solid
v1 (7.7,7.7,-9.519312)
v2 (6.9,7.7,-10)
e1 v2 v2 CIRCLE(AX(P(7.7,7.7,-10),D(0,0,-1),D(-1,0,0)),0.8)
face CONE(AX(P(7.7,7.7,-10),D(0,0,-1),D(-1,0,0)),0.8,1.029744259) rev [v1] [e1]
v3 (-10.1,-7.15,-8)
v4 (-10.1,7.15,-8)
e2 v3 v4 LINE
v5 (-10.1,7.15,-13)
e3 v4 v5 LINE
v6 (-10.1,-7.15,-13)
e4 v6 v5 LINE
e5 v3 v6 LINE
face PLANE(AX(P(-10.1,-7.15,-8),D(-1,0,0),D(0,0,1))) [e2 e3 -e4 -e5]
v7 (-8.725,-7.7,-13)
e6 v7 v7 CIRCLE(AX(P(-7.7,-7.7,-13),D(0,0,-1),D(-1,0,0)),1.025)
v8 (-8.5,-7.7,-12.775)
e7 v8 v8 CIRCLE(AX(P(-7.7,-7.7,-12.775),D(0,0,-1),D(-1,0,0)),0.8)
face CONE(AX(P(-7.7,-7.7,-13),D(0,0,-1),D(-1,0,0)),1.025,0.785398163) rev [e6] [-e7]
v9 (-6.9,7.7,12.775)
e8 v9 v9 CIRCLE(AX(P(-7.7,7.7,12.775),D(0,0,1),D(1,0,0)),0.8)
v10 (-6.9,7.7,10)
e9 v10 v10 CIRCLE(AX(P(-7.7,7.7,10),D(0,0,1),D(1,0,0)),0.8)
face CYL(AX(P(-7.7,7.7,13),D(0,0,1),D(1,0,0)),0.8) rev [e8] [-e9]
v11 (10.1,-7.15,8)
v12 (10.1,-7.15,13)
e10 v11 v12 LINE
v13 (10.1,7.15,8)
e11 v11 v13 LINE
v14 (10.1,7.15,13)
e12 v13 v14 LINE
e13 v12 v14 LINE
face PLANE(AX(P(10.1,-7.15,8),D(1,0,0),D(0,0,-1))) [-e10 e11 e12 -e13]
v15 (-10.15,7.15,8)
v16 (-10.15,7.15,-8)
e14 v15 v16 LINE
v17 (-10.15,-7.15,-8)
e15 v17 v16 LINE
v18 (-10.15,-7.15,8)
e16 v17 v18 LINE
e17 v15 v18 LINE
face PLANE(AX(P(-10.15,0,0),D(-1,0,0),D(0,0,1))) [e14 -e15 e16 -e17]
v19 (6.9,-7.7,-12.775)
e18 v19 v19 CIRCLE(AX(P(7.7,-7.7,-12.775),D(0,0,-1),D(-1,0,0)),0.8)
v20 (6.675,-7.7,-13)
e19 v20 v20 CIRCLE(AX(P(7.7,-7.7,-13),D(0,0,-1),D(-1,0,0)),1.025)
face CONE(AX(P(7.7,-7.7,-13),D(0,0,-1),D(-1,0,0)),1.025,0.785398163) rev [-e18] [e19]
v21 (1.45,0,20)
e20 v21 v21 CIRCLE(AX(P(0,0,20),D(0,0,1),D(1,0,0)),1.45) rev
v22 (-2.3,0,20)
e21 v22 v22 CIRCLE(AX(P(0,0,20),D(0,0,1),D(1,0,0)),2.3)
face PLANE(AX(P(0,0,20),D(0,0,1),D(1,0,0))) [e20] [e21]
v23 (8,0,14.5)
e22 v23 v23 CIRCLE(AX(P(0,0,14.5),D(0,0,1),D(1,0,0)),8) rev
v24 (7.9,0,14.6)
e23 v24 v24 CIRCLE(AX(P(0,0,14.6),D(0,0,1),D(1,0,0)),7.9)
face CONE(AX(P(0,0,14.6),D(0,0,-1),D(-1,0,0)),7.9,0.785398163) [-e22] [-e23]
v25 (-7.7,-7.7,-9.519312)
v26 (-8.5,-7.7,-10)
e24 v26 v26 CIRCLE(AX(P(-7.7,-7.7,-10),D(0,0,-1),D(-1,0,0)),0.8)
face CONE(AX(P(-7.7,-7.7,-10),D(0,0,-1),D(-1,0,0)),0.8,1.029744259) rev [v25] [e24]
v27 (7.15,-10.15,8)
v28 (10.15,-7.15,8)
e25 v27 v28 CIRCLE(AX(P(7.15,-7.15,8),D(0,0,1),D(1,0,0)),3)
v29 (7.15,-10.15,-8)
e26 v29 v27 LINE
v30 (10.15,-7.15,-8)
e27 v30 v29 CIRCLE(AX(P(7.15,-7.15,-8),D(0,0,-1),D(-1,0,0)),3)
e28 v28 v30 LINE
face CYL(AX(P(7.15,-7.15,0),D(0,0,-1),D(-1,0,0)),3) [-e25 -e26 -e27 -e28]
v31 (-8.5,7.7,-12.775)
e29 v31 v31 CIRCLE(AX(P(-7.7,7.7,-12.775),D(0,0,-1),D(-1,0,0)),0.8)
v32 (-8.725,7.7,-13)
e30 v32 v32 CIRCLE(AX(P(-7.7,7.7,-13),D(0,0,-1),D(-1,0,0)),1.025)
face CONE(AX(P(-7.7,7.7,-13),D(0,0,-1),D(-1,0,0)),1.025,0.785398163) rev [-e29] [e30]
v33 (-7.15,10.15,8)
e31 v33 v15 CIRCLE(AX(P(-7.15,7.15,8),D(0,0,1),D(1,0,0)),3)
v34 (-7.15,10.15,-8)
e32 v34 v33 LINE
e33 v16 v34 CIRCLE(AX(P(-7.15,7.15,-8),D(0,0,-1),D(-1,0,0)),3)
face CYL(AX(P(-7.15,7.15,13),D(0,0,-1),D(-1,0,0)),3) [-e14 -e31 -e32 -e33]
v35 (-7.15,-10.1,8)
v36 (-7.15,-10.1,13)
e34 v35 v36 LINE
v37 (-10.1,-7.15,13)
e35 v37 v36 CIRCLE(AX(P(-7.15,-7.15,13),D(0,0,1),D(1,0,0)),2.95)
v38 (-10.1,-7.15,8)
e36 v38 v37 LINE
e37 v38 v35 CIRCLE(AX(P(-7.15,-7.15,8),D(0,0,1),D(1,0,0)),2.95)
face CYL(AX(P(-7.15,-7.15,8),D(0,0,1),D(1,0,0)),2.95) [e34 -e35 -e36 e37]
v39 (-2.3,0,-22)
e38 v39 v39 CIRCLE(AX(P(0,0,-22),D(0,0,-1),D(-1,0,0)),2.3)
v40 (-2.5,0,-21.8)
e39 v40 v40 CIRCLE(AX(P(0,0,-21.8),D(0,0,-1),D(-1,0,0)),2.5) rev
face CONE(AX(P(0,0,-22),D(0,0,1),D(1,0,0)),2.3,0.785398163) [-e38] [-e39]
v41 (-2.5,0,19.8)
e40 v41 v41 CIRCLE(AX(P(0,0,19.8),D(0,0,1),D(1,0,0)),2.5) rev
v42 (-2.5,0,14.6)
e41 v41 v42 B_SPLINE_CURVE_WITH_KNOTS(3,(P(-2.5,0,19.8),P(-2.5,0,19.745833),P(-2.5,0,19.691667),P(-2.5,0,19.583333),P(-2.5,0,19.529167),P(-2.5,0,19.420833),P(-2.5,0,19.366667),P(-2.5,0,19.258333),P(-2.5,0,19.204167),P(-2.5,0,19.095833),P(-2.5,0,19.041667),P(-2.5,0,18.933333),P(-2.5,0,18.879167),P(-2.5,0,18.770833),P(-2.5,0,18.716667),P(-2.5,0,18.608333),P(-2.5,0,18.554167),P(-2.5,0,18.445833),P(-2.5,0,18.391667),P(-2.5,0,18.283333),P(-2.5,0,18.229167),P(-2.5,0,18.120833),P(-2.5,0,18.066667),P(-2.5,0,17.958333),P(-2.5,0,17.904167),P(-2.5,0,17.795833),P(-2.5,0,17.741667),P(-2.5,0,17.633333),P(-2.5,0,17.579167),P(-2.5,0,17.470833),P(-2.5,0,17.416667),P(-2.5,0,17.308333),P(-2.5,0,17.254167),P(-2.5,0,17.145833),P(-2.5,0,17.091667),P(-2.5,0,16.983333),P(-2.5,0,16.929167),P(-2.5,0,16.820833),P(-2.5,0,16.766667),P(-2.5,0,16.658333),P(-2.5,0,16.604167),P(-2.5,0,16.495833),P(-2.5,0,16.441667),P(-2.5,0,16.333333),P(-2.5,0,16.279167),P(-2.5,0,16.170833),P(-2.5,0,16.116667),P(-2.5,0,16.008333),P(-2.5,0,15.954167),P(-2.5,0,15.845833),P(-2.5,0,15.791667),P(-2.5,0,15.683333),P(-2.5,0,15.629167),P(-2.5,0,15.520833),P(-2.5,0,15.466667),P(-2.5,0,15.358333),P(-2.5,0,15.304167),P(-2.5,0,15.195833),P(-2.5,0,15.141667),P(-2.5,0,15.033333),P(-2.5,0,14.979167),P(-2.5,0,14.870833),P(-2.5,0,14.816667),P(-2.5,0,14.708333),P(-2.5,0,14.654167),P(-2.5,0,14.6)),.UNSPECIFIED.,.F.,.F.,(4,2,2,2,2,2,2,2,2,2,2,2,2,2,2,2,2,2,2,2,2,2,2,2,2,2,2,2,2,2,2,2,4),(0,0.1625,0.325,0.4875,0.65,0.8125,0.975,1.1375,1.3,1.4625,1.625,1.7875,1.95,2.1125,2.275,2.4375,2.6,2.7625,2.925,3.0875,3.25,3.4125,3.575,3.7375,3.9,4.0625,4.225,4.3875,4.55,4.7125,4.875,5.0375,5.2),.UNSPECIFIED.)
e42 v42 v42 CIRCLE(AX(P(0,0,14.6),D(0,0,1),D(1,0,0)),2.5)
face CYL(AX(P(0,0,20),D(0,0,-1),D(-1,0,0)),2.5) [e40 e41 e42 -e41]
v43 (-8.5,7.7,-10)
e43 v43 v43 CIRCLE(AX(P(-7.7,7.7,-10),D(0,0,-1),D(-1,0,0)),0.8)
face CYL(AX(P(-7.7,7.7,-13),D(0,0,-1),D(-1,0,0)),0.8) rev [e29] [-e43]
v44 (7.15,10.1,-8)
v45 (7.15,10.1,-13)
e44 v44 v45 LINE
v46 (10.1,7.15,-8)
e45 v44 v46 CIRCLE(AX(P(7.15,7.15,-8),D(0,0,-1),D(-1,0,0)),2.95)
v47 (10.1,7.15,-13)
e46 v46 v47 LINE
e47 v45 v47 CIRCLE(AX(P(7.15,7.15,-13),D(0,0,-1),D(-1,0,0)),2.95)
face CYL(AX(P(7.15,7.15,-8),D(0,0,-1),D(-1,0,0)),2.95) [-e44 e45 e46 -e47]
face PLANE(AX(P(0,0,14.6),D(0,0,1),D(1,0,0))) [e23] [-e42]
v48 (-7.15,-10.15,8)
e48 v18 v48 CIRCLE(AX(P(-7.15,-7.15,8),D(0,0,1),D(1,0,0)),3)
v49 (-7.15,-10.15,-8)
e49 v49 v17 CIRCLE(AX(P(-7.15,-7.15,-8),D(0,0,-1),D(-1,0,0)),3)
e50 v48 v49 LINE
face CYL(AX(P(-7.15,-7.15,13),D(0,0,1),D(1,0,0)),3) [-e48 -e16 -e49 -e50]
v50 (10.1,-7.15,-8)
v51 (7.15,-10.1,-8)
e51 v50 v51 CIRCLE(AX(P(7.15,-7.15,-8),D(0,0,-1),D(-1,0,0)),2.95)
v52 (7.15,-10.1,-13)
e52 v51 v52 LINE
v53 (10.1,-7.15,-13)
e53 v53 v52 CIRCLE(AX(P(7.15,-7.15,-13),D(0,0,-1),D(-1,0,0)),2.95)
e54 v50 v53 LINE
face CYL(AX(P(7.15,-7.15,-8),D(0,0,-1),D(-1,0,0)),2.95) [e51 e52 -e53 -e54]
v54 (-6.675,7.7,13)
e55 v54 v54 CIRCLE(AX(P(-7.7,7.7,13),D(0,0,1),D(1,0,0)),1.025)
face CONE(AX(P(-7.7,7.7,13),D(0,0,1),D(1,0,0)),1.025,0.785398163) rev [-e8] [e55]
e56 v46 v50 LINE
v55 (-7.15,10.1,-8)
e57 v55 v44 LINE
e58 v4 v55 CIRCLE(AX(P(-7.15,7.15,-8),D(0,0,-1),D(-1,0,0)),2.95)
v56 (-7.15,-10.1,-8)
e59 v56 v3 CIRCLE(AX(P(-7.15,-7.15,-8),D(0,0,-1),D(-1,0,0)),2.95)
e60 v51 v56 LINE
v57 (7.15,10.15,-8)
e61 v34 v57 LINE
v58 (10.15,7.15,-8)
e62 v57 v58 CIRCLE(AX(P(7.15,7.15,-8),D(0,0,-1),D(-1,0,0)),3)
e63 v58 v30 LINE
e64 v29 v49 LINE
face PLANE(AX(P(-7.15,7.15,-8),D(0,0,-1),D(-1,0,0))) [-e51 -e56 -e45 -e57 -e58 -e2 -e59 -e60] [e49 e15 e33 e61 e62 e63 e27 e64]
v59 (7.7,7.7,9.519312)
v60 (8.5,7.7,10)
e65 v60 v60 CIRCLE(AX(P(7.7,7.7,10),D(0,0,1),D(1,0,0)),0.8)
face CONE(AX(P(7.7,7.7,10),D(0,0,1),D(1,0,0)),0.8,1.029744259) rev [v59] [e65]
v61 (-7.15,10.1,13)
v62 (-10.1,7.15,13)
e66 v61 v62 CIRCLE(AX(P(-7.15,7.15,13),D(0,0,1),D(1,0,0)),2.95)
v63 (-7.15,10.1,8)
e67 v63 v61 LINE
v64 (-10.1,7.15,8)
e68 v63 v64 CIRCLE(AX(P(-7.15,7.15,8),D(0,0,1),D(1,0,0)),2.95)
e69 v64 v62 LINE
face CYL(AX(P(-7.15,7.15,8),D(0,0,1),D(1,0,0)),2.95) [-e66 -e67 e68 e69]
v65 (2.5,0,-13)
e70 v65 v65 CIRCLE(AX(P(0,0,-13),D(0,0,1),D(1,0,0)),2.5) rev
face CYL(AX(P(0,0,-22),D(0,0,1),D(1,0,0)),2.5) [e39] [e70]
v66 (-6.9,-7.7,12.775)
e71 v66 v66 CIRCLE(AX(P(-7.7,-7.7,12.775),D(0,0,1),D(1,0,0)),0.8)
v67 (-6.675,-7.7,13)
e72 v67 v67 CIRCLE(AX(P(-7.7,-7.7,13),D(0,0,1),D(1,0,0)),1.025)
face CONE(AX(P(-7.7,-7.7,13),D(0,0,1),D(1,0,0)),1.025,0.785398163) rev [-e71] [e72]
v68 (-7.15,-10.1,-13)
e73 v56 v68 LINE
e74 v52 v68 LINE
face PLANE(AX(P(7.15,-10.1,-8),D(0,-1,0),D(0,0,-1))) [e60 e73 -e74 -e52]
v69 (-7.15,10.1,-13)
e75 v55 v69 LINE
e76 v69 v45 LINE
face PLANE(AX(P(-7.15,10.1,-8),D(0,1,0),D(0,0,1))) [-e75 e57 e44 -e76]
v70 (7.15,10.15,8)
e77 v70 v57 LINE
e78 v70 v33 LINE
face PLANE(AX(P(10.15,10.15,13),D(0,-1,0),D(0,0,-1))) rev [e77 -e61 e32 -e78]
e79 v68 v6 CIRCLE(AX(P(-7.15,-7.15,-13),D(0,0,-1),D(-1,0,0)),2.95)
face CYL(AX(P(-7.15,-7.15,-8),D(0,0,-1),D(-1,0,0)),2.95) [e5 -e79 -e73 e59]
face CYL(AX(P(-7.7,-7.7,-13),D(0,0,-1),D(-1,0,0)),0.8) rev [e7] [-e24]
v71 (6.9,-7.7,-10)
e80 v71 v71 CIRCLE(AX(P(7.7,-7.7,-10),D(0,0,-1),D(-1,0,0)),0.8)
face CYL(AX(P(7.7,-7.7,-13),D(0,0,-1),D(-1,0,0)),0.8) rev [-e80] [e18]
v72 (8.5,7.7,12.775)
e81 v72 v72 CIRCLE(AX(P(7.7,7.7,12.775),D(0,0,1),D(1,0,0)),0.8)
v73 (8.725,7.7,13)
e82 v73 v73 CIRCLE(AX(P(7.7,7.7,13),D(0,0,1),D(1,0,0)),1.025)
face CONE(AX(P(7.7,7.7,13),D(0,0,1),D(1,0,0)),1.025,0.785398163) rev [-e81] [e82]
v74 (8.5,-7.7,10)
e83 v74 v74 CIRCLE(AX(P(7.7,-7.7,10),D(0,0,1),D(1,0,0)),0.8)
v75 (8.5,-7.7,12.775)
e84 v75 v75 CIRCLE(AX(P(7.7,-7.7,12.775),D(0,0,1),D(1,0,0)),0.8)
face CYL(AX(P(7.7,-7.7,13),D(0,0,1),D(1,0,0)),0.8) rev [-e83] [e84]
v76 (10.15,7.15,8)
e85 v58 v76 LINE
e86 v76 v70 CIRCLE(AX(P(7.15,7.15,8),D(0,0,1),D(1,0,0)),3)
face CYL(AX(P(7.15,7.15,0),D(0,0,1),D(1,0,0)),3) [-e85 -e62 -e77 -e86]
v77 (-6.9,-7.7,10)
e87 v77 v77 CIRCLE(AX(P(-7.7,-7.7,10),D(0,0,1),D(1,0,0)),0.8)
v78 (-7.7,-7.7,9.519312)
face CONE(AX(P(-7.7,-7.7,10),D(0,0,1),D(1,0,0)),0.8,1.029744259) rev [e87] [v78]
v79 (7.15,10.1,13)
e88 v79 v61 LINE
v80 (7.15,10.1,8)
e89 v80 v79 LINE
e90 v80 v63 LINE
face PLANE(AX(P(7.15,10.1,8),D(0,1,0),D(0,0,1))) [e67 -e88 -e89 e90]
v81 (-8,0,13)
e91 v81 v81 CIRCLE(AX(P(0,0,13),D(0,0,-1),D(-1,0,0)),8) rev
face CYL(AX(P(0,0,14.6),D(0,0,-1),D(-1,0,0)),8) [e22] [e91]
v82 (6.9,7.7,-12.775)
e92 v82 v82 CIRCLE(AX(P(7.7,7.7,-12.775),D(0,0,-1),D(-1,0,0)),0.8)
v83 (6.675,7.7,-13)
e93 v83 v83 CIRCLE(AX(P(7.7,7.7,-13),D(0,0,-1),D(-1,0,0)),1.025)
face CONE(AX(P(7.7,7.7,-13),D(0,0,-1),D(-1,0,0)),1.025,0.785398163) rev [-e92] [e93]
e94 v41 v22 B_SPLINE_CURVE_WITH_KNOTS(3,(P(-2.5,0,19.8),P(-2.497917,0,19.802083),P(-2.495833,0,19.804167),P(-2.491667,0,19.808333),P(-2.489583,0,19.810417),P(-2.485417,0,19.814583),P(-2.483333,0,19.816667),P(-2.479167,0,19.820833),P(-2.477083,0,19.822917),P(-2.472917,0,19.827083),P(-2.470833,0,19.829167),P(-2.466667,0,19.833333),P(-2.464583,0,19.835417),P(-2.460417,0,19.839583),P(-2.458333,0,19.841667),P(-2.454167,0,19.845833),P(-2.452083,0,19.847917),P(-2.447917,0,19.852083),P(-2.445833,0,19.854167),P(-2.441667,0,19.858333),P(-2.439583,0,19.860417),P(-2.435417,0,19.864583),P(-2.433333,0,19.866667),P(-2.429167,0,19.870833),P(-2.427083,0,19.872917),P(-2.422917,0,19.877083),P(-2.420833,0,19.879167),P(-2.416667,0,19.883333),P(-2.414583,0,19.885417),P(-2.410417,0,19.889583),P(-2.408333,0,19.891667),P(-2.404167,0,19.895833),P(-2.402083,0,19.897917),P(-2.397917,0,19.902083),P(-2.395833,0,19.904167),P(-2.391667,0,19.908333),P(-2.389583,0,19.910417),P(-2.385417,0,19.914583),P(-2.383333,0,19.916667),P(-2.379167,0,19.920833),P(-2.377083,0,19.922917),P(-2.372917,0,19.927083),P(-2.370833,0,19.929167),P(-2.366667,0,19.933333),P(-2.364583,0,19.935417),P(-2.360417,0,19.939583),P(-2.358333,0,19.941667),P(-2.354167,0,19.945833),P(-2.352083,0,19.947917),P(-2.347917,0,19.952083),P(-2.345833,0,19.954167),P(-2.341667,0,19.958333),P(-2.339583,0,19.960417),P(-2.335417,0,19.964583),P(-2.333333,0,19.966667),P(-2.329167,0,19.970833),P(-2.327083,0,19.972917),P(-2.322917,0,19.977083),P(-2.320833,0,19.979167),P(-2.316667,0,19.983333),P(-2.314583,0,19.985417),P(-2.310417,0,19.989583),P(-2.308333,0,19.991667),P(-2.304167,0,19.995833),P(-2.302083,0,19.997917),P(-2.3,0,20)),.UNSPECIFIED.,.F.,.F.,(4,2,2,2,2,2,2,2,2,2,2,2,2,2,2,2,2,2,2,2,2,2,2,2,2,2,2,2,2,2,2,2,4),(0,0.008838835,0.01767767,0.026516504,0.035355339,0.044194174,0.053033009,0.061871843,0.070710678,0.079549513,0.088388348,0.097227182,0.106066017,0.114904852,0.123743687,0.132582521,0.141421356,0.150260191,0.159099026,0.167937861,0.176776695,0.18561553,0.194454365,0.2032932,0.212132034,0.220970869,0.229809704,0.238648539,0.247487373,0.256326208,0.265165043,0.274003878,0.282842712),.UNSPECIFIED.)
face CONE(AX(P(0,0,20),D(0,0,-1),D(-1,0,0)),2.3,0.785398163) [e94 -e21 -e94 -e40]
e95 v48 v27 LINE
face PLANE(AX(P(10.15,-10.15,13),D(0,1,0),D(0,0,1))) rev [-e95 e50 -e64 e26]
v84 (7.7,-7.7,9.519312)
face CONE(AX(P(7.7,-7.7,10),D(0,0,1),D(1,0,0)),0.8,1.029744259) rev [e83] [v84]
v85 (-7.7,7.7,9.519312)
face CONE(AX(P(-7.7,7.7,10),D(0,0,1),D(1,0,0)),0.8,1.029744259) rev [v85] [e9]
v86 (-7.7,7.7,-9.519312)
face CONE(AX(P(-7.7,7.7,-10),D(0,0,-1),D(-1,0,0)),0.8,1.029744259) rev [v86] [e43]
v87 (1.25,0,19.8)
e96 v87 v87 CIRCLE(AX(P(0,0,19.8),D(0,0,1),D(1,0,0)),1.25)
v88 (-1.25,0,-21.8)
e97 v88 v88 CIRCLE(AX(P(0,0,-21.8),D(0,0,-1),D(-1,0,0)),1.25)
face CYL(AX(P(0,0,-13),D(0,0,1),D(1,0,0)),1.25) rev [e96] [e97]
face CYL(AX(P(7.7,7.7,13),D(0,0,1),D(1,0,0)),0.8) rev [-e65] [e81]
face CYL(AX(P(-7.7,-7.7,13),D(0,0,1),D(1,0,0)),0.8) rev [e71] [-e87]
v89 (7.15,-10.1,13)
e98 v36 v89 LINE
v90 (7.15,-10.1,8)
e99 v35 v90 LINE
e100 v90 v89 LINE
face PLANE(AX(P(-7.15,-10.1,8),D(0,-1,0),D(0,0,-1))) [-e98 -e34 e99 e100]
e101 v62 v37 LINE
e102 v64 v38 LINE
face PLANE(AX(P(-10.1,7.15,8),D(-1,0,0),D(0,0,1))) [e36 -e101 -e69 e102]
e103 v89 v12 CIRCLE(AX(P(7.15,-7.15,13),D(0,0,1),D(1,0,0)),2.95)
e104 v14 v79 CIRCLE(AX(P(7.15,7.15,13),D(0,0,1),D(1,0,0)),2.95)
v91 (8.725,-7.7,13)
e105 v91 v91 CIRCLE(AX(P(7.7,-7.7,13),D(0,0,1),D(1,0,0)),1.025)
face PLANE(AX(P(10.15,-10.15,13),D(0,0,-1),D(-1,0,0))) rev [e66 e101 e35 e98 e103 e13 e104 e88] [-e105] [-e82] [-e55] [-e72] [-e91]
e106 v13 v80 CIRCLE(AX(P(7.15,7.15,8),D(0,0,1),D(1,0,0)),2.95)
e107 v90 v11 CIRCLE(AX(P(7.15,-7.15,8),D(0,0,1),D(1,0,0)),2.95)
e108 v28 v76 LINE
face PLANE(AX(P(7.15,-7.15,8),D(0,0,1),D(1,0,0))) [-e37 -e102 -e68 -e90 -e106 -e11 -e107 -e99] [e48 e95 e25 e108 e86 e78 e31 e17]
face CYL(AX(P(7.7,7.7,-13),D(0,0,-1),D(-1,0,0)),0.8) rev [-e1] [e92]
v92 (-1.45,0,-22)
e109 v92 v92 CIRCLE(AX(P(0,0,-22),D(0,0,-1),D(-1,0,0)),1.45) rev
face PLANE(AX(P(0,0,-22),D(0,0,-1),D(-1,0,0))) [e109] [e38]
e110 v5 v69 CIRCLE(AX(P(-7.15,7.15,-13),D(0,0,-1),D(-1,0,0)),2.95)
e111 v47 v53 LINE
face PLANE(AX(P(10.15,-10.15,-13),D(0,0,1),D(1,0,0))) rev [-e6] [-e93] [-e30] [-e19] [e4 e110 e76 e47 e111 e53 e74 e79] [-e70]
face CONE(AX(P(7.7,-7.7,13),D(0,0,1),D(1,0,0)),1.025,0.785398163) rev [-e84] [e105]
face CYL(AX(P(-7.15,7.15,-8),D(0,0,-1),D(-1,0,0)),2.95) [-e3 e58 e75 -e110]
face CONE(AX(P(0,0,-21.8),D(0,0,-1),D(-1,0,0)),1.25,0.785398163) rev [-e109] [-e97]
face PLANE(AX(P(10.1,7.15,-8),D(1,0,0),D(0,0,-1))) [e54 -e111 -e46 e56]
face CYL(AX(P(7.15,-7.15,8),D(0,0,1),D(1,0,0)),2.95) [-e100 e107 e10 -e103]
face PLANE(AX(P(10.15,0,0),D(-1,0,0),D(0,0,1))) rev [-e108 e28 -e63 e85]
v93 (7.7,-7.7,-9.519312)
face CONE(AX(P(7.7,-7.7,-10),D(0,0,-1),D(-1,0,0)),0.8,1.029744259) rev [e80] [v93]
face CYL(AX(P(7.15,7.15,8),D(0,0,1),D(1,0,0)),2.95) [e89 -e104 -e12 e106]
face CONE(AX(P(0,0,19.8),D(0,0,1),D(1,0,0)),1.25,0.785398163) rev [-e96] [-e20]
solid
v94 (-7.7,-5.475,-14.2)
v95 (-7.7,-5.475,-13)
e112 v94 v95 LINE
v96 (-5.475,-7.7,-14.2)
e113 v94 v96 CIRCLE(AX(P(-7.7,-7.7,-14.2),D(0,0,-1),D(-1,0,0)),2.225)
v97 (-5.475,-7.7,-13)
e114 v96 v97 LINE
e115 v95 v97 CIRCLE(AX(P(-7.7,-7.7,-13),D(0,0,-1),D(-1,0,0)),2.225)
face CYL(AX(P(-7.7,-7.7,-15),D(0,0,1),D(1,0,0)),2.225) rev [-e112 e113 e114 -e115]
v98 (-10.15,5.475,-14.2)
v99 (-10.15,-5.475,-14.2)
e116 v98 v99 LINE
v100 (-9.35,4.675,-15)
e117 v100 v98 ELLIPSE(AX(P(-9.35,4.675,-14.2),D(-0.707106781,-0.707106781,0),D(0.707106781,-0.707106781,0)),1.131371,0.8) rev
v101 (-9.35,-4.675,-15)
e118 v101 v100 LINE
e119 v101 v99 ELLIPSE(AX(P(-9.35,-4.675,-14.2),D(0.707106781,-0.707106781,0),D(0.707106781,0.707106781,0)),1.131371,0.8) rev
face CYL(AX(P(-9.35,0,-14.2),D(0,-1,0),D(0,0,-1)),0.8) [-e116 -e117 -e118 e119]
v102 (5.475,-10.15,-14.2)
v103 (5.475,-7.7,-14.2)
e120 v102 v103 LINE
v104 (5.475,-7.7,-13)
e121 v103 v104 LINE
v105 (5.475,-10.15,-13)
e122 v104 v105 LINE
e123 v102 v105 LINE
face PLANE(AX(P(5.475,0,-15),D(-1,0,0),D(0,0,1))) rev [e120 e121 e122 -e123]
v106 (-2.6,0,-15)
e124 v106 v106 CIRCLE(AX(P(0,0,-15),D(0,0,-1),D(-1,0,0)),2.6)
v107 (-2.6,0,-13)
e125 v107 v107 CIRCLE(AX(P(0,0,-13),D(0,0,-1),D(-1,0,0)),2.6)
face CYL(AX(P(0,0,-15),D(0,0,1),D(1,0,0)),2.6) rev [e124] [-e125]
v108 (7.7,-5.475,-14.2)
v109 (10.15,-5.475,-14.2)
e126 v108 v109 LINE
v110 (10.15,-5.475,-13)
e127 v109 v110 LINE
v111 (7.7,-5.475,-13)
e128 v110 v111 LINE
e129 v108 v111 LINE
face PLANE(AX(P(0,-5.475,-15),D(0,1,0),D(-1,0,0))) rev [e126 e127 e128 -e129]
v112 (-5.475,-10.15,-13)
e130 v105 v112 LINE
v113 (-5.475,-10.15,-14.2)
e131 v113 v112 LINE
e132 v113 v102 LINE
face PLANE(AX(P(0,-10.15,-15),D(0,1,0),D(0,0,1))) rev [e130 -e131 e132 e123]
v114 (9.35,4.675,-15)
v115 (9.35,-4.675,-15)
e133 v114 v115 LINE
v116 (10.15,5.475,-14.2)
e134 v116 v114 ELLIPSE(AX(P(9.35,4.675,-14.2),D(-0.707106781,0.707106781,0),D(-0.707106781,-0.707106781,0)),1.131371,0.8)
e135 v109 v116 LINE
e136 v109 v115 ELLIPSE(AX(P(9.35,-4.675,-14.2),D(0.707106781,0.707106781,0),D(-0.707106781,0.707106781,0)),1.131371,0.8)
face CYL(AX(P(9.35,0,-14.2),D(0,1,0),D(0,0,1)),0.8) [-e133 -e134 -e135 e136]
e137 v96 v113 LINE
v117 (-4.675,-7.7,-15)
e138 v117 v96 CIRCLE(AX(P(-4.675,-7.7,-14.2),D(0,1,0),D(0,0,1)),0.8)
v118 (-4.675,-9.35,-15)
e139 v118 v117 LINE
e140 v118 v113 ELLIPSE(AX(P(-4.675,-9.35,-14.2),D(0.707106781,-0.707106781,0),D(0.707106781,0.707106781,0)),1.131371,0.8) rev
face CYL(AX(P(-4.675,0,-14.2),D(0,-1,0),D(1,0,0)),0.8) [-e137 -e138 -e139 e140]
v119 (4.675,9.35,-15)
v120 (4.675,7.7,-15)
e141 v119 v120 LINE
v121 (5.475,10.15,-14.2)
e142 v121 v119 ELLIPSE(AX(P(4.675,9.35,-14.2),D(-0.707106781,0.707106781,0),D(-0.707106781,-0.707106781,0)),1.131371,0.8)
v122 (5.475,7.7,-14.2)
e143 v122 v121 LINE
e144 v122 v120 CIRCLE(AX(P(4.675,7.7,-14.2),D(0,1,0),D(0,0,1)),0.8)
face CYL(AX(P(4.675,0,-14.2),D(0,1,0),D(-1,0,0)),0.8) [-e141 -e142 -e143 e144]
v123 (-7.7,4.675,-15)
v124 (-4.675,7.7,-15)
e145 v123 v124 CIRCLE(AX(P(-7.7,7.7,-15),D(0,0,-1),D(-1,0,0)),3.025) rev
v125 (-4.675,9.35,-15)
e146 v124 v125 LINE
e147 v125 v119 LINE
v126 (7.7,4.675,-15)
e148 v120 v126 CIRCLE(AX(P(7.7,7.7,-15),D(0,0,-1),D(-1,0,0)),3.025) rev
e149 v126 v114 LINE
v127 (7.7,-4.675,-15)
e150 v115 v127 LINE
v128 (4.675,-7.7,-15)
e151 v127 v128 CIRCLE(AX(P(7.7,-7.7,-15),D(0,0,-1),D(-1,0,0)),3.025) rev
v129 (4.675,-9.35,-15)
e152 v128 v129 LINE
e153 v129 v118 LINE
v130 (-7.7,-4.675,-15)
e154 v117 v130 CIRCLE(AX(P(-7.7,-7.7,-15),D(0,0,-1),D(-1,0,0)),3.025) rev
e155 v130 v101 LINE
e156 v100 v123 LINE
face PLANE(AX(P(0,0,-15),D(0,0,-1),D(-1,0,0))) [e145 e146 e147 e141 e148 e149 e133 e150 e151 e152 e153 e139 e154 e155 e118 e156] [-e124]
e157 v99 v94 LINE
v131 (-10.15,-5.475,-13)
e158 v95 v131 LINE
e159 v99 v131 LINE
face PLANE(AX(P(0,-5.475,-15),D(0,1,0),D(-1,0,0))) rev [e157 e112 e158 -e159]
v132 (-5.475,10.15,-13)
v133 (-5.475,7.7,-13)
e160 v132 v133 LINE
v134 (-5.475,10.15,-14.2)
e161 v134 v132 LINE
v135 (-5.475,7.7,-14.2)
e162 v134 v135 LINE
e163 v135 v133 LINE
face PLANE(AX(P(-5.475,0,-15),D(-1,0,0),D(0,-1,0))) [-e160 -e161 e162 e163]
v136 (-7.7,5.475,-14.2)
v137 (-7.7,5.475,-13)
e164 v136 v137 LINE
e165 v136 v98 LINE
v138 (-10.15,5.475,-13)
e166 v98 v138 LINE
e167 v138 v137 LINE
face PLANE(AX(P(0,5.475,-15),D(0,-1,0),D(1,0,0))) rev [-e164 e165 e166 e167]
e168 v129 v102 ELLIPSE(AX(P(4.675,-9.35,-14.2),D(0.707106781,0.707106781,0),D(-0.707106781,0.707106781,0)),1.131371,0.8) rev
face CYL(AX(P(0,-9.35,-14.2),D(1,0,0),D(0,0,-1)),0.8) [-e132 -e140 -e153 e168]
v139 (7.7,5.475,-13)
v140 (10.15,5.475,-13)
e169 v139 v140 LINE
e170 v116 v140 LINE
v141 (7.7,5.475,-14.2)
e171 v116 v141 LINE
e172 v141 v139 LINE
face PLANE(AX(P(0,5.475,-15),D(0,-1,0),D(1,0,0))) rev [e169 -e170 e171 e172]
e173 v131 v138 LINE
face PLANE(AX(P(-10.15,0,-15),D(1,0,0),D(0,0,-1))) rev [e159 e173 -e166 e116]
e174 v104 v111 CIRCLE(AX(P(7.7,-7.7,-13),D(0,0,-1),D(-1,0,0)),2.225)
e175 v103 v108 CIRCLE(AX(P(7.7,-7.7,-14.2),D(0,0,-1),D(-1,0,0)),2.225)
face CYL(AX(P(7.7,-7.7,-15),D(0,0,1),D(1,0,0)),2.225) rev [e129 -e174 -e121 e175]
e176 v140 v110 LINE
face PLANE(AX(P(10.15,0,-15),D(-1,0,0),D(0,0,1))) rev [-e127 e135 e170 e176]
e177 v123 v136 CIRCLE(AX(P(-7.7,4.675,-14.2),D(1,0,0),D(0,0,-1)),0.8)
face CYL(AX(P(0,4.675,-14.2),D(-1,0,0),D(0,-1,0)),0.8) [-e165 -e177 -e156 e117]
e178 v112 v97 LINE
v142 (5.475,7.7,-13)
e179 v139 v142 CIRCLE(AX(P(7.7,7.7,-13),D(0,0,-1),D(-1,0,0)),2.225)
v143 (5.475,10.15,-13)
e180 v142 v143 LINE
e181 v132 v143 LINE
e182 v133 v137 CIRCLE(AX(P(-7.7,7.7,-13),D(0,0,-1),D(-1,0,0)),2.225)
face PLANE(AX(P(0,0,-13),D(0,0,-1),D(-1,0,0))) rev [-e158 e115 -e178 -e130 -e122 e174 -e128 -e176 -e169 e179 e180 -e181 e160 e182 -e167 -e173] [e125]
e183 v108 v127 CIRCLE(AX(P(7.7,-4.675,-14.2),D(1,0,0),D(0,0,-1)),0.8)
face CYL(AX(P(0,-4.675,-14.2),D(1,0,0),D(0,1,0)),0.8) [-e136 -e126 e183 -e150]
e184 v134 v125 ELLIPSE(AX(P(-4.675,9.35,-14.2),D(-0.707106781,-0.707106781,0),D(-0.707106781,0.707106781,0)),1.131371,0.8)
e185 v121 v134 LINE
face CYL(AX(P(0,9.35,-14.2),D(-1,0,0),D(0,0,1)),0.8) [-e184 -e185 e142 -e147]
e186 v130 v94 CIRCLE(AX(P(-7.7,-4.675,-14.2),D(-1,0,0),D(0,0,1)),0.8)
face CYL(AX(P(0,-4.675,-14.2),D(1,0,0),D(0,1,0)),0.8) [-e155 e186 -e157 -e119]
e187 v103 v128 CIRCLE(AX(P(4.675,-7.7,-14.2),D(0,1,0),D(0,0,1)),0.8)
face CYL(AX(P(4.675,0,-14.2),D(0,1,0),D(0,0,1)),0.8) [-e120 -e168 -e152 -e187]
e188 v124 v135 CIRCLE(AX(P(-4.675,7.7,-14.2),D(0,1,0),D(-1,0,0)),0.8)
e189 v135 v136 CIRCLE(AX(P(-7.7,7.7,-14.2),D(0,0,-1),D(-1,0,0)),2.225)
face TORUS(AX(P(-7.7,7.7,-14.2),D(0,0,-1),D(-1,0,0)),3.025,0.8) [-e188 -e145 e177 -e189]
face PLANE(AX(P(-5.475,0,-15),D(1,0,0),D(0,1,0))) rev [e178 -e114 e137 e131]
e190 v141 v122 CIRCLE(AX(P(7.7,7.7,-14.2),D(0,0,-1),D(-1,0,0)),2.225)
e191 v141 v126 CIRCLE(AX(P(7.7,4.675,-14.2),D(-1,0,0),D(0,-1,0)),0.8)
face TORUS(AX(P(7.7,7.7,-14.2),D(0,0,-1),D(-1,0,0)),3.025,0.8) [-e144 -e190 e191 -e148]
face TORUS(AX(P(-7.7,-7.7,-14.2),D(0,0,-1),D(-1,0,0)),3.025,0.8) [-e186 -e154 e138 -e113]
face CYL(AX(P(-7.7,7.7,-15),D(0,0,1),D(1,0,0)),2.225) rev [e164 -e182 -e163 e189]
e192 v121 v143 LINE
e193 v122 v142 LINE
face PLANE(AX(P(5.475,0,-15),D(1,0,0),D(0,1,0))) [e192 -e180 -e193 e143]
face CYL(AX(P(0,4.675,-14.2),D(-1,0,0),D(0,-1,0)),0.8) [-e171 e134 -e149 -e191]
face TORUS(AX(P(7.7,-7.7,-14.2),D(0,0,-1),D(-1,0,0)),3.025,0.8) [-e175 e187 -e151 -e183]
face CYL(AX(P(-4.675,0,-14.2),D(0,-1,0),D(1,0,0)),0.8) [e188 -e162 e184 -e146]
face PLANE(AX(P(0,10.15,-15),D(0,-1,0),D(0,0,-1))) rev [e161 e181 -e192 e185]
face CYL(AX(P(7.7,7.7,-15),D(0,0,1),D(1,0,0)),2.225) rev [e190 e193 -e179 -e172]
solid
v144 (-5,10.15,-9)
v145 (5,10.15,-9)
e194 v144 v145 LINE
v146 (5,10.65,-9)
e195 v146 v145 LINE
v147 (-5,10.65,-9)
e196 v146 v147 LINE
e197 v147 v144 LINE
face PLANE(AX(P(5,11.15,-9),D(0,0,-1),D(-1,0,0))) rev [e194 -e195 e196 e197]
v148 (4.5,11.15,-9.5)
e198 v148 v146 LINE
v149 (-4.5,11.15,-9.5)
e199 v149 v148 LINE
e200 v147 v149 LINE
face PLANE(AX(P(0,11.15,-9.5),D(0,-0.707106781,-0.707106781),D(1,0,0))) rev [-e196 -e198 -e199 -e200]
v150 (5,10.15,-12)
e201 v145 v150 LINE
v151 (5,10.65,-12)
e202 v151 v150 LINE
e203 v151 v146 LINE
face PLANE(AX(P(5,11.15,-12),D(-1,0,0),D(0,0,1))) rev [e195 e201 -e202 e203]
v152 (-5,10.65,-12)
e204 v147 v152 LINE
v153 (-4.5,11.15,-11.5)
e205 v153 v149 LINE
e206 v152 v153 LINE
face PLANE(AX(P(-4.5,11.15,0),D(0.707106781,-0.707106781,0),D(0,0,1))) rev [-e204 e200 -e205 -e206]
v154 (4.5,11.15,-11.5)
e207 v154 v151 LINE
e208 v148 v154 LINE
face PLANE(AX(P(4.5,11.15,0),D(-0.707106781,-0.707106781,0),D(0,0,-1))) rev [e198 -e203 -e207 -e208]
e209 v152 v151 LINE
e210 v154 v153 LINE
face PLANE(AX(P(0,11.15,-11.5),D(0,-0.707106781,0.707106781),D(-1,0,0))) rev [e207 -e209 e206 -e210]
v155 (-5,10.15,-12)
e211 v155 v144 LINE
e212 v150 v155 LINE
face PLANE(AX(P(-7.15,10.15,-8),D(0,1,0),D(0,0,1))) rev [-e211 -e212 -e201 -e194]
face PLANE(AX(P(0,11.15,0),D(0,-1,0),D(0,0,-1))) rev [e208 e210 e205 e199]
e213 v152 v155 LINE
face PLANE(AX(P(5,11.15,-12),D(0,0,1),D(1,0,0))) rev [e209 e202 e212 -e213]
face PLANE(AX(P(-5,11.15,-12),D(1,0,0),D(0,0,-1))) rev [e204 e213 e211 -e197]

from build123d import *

# Parameters (mm, degrees)
SKETCH1_W               = 26
SKETCH1_H               = 20.3
BOSS_EXTRUDE1_DEPTH     = 10.15
SKETCH2_R               = 8
BOSS_EXTRUDE2_DEPTH     = 1.6
SKETCH3_R               = 2.5
BOSS_EXTRUDE3_DEPTH     = 5.4
CUT_EXTRUDE1_DEPTH      = 36.986733667
CUT_EXTRUDE1_DEPTH_BACK = 36.986733667
SKETCH4_R               = 1.25
CHAMFER1_SIZE           = 0.2
CHAMFER2_SIZE           = 0.2
SKETCH6_R               = 2.5
SKETCH6_R_2             = 1.25
BOSS_EXTRUDE4_DEPTH     = 9
SKETCH7_R               = 0.5
CUT_EXTRUDE2_DEPTH      = 2
CUT_EXTRUDE3_START      = -2
SKETCH8_R               = 0.5
CUT_EXTRUDE3_DEPTH      = 2
FILLET1_R               = 3
SKETCH10_R              = 2.6
BOSS_EXTRUDE5_DEPTH     = 2
FILLET2_R               = 0.8
SKETCH13_W              = 10
SKETCH13_H              = 3
BOSS_EXTRUDE7_DEPTH     = 1
CHAMFER3_SIZE           = 0.5
CUT_EXTRUDE5_DEPTH      = 5
CUT_EXTRUDE6_START      = -5
CUT_EXTRUDE6_DEPTH      = 5
CHAMFER4_SIZE           = 0.2
CHAMFER5_SIZE           = 0.1


# Read off the part's stored shape, not the designer's step: M2 Tapped Hole1
with BuildPart() as part:
    # Sketch1 → Boss-Extrude1 (new, symmetric)
    with BuildSketch(Plane(origin=(0, 0, 0), x_dir=(0, 0, -1), z_dir=(1, 0, 0))):
        Rectangle(SKETCH1_W, SKETCH1_H)
    extrude(amount=BOSS_EXTRUDE1_DEPTH, both=True)

    # Sketch2 → Boss-Extrude2 (add)
    with BuildSketch(Plane.XY.offset(13)):
        with Locations(Location((0, 0, 0), (0, 0, 180))):
            Circle(SKETCH2_R)
    extrude(amount=BOSS_EXTRUDE2_DEPTH)

    # Sketch3 → Boss-Extrude3 (add)
    with BuildSketch(Plane.XY.offset(14.6)):
        with Locations(Location((0, 0, 0), (0, 0, 180))):
            Circle(SKETCH3_R)
    extrude(amount=BOSS_EXTRUDE3_DEPTH)

    # Sketch4 → Cut-Extrude1 (cut, two sides: drawn at the far end of the back side and taken through both)
    with BuildSketch(Plane.XY.offset(20).offset(-CUT_EXTRUDE1_DEPTH_BACK)):
        Circle(SKETCH4_R)
    extrude(amount=CUT_EXTRUDE1_DEPTH + CUT_EXTRUDE1_DEPTH_BACK, mode=Mode.SUBTRACT)

    # Chamfer1
    chamfer1_edges = [part.edges().sort_by_distance(p)[0] for p in [
        (-1.25, 0, 20),
    ]]
    chamfer(chamfer1_edges, length=CHAMFER1_SIZE)

    # Chamfer2
    chamfer2_edges = [part.edges().sort_by_distance(p)[0] for p in [
        (2.5, 0, 20),
    ]]
    chamfer(chamfer2_edges, length=CHAMFER2_SIZE)

    # Sketch6 → Boss-Extrude4 (add)
    with BuildSketch(Plane(origin=(0, 0, -13), x_dir=(-1, 0, 0), z_dir=(0, 0, -1))):
        Circle(SKETCH6_R)
        with Locations(Location((0, 0, 0), (0, 0, 180))):
            Circle(SKETCH6_R_2, mode=Mode.SUBTRACT)
    extrude(amount=BOSS_EXTRUDE4_DEPTH)

    # Sketch7 → Cut-Extrude2 (cut)
    with BuildSketch(Plane.XY.offset(13)):
        with Locations((-7.7, 7.7)):
            Circle(SKETCH7_R)
        with Locations((7.7, 7.7)):
            Circle(SKETCH7_R)
        with Locations((7.7, -7.7)):
            Circle(SKETCH7_R)
        with Locations((-7.7, -7.7)):
            Circle(SKETCH7_R)
    extrude(amount=-CUT_EXTRUDE2_DEPTH, mode=Mode.SUBTRACT)

    # Sketch8 → Cut-Extrude3 (cut)
    with BuildSketch(Plane(origin=(0, 0, -13), x_dir=(-1, 0, 0), z_dir=(0, 0, -1)).offset(CUT_EXTRUDE3_START)):
        with Locations(Location((7.7, -7.7, 0), (0, 0, 180))):
            Circle(SKETCH8_R)
        with Locations(Location((-7.7, -7.7, 0), (0, 0, 180))):
            Circle(SKETCH8_R)
        with Locations(Location((-7.7, 7.7, 0), (0, 0, 180))):
            Circle(SKETCH8_R)
        with Locations(Location((7.7, 7.7, 0), (0, 0, 180))):
            Circle(SKETCH8_R)
    extrude(amount=CUT_EXTRUDE3_DEPTH, mode=Mode.SUBTRACT)

    # M2 Tapped Hole1 outline → M2 Tapped Hole1 (revolve, cut)
    with BuildSketch(Plane(origin=(-7.7, 7.7, 0), x_dir=(1, 0, 0), z_dir=(0, -1, 0))):
        Polygon((0, -9.519311505), (0, -11), (0.5, -11), (0.5, -13), (1.025, -13), (0.8, -12.775), (0.8, -10), align=None)
        Polygon((0, 11), (0, 9.519311505), (0.8, 10), (0.8, 12.775), (1.025, 13), (0.5, 13), (0.5, 11), align=None)
    revolve(axis=Axis((-7.7, 7.7, 0), (0, 0, 1)), mode=Mode.SUBTRACT)

    # M2 Tapped Hole1 2 outline → M2 Tapped Hole1 2 (revolve, cut)
    with BuildSketch(Plane(origin=(7.7, -7.7, 0), x_dir=(1, 0, 0), z_dir=(0, -1, 0))):
        Polygon((0, -9.519311505), (0, -11), (0.5, -11), (0.5, -13), (1.025, -13), (0.8, -12.775), (0.8, -10), align=None)
        Polygon((0, 11), (0, 9.519311505), (0.8, 10), (0.8, 12.775), (1.025, 13), (0.5, 13), (0.5, 11), align=None)
    revolve(axis=Axis((7.7, -7.7, 0), (0, 0, 1)), mode=Mode.SUBTRACT)

    # M2 Tapped Hole1 3 outline → M2 Tapped Hole1 3 (revolve, cut)
    with BuildSketch(Plane(origin=(7.7, 7.7, 0), x_dir=(1, 0, 0), z_dir=(0, -1, 0))):
        Polygon((0, -9.519311505), (0, -11), (0.5, -11), (0.5, -13), (1.025, -13), (0.8, -12.775), (0.8, -10), align=None)
        Polygon((0, 11), (0, 9.519311505), (0.8, 10), (0.8, 12.775), (1.025, 13), (0.5, 13), (0.5, 11), align=None)
    revolve(axis=Axis((7.7, 7.7, 0), (0, 0, 1)), mode=Mode.SUBTRACT)

    # M2 Tapped Hole1 4 outline → M2 Tapped Hole1 4 (revolve, cut)
    with BuildSketch(Plane(origin=(-7.7, -7.7, 0), x_dir=(1, 0, 0), z_dir=(0, -1, 0))):
        Polygon((0, -9.519311505), (0, -11), (0.5, -11), (0.5, -13), (1.025, -13), (0.8, -12.775), (0.8, -10), align=None)
        Polygon((0, 11), (0, 9.519311505), (0.8, 10), (0.8, 12.775), (1.025, 13), (0.5, 13), (0.5, 11), align=None)
    revolve(axis=Axis((-7.7, -7.7, 0), (0, 0, 1)), mode=Mode.SUBTRACT)

    # Fillet1
    fillet1_edges = [part.edges().sort_by_distance(p)[0] for p in [
        (10.15, -10.15, 0),
        (-10.15, -10.15, 0),
        (-10.15, 10.15, 0),
        (10.15, 10.15, 0),
    ]]
    fillet(fillet1_edges, radius=FILLET1_R)

    # Sketch13 → Boss-Extrude7 (add)
    with BuildSketch(Plane(origin=(0, 10.15, 0), x_dir=(1, 0, 0), z_dir=(0, 1, 0))):
        with Locations((0, 10.5)):
            Rectangle(SKETCH13_W, SKETCH13_H)
    extrude(amount=BOSS_EXTRUDE7_DEPTH)

    # Chamfer3
    chamfer3_edges = [part.edges().sort_by_distance(p)[0] for p in [
        (-5, 11.15, -10.5),
        (0, 11.15, -9),
        (5, 11.15, -10.5),
        (0, 11.15, -12),
    ]]
    chamfer(chamfer3_edges, length=CHAMFER3_SIZE)

    # Sketch14 → Cut-Extrude5 (cut)
    with BuildSketch(Plane.XY.offset(13)):
        with BuildLine():
            Line((10.15, -7.15), (10.15, 7.15))
            ThreePointArc((10.15, 7.15), (9.271320344, 9.271320344), (7.15, 10.15))
            Line((7.15, 10.15), (-7.15, 10.15))
            ThreePointArc((-7.15, 10.15), (-9.271320344, 9.271320344), (-10.15, 7.15))
            Line((-10.15, 7.15), (-10.15, -7.15))
            ThreePointArc((-10.15, -7.15), (-9.271320344, -9.271320344), (-7.15, -10.15))
            Line((-7.15, -10.15), (7.15, -10.15))
            ThreePointArc((7.15, -10.15), (9.271320344, -9.271320344), (10.15, -7.15))
        make_face()
        with BuildLine():
            Line((10.1, -7.15), (10.1, 7.15))
            ThreePointArc((10.1, 7.15), (9.235965005, 9.235965005), (7.15, 10.1))
            Line((7.15, 10.1), (-7.15, 10.1))
            ThreePointArc((-7.15, 10.1), (-9.235965005, 9.235965005), (-10.1, 7.15))
            Line((-10.1, 7.15), (-10.1, -7.15))
            ThreePointArc((-10.1, -7.15), (-9.235965005, -9.235965005), (-7.15, -10.1))
            Line((-7.15, -10.1), (7.15, -10.1))
            ThreePointArc((7.15, -10.1), (9.235965005, -9.235965005), (10.1, -7.15))
        make_face(mode=Mode.SUBTRACT)
    extrude(amount=-CUT_EXTRUDE5_DEPTH, mode=Mode.SUBTRACT)

    # Sketch15 → Cut-Extrude6 (cut)
    with BuildSketch(Plane(origin=(0, 0, -13), x_dir=(-1, 0, 0), z_dir=(0, 0, -1)).offset(CUT_EXTRUDE6_START)):
        with BuildLine():
            Line((7.15, 10.15), (-7.15, 10.15))
            ThreePointArc((-7.15, 10.15), (-9.271320344, 9.271320344), (-10.15, 7.15))
            Line((-10.15, 7.15), (-10.15, -7.15))
            ThreePointArc((-10.15, -7.15), (-9.271320344, -9.271320344), (-7.15, -10.15))
            Line((-7.15, -10.15), (7.15, -10.15))
            ThreePointArc((7.15, -10.15), (9.271320344, -9.271320344), (10.15, -7.15))
            Line((10.15, -7.15), (10.15, 7.15))
            ThreePointArc((10.15, 7.15), (9.271320344, 9.271320344), (7.15, 10.15))
        make_face()
        with BuildLine():
            Line((-10.1, 7.15), (-10.1, -7.15))
            ThreePointArc((-10.1, -7.15), (-9.235965005, -9.235965005), (-7.15, -10.1))
            Line((-7.15, -10.1), (7.15, -10.1))
            ThreePointArc((7.15, -10.1), (9.235965005, -9.235965005), (10.1, -7.15))
            Line((10.1, -7.15), (10.1, 7.15))
            ThreePointArc((10.1, 7.15), (9.235965005, 9.235965005), (7.15, 10.1))
            Line((7.15, 10.1), (-7.15, 10.1))
            ThreePointArc((-7.15, 10.1), (-9.235965005, 9.235965005), (-10.1, 7.15))
        make_face(mode=Mode.SUBTRACT)
    extrude(amount=CUT_EXTRUDE6_DEPTH, mode=Mode.SUBTRACT)


with BuildPart() as body_2:
    # Sketch10 → Boss-Extrude5 (new body)
    with BuildSketch(Plane(origin=(0, 0, -13), x_dir=(-1, 0, 0), z_dir=(0, 0, -1))):
        with BuildLine():
            ThreePointArc((-5.475, 7.7), (-6.126687412, 6.126687412), (-7.7, 5.475))
            Line((-7.7, 5.475), (-10.15, 5.475))
            Line((-10.15, 5.475), (-10.15, -5.475))
            Line((-10.15, -5.475), (-7.7, -5.475))
            ThreePointArc((-7.7, -5.475), (-6.126687412, -6.126687412), (-5.475, -7.7))
            Line((-5.475, -7.7), (-5.475, -10.15))
            Line((-5.475, -10.15), (5.475, -10.15))
            Line((5.475, -10.15), (5.475, -7.7))
            ThreePointArc((5.475, -7.7), (6.126687412, -6.126687412), (7.7, -5.475))
            Line((7.7, -5.475), (10.15, -5.475))
            Line((10.15, -5.475), (10.15, 5.475))
            Line((10.15, 5.475), (7.7, 5.475))
            ThreePointArc((7.7, 5.475), (6.126687412, 6.126687412), (5.475, 7.7))
            Line((5.475, 7.7), (5.475, 10.15))
            Line((5.475, 10.15), (-5.475, 10.15))
            Line((-5.475, 10.15), (-5.475, 7.7))
        make_face()
        Circle(SKETCH10_R, mode=Mode.SUBTRACT)
    extrude(amount=BOSS_EXTRUDE5_DEPTH)

    # Fillet2
    fillet2_edges = [body_2.edges().sort_by_distance(p)[0] for p in [
        (-6.126687412, -6.126687412, -15),
        (-8.925, -5.475, -15),
        (-10.15, 0, -15),
        (-8.925, 5.475, -15),
        (-6.126687412, 6.126687412, -15),
        (-5.475, 8.925, -15),
        (0, 10.15, -15),
        (5.475, 8.925, -15),
        (6.126687412, 6.126687412, -15),
        (8.925, 5.475, -15),
        (10.15, 0, -15),
        (8.925, -5.475, -15),
        (6.126687412, -6.126687412, -15),
        (5.475, -8.925, -15),
        (0, -10.15, -15),
        (-5.475, -8.925, -15),
    ]]
    fillet(fillet2_edges, radius=FILLET2_R)


with BuildPart() as cut_extrude6_piece_1:
    # of the separate pieces the step leaves, piece 1, a body of its own (cut_extrude6_pieces)
    add(part.part.solids().sort_by_distance((-7.15, 10.15, -8))[0])

    # Chamfer4
    chamfer4_edges = [cut_extrude6_piece_1.edges().sort_by_distance(p)[0] for p in [
        (-1.25, 0, -22),
        (2.5, 0, -22),
    ]]
    chamfer(chamfer4_edges, length=CHAMFER4_SIZE)

    # Chamfer5
    chamfer5_edges = [cut_extrude6_piece_1.edges().sort_by_distance(p)[0] for p in [
        (8, 0, 14.6),
    ]]
    chamfer(chamfer5_edges, length=CHAMFER5_SIZE)


with BuildPart() as cut_extrude6_piece_2:
    # of the separate pieces the step leaves, piece 2, a body of its own (cut_extrude6_pieces)
    add(part.part.solids().sort_by_distance((5, 10.65, -12))[0])


solid = Compound([body_2.part, cut_extrude6_piece_1.part, cut_extrude6_piece_2.part])
